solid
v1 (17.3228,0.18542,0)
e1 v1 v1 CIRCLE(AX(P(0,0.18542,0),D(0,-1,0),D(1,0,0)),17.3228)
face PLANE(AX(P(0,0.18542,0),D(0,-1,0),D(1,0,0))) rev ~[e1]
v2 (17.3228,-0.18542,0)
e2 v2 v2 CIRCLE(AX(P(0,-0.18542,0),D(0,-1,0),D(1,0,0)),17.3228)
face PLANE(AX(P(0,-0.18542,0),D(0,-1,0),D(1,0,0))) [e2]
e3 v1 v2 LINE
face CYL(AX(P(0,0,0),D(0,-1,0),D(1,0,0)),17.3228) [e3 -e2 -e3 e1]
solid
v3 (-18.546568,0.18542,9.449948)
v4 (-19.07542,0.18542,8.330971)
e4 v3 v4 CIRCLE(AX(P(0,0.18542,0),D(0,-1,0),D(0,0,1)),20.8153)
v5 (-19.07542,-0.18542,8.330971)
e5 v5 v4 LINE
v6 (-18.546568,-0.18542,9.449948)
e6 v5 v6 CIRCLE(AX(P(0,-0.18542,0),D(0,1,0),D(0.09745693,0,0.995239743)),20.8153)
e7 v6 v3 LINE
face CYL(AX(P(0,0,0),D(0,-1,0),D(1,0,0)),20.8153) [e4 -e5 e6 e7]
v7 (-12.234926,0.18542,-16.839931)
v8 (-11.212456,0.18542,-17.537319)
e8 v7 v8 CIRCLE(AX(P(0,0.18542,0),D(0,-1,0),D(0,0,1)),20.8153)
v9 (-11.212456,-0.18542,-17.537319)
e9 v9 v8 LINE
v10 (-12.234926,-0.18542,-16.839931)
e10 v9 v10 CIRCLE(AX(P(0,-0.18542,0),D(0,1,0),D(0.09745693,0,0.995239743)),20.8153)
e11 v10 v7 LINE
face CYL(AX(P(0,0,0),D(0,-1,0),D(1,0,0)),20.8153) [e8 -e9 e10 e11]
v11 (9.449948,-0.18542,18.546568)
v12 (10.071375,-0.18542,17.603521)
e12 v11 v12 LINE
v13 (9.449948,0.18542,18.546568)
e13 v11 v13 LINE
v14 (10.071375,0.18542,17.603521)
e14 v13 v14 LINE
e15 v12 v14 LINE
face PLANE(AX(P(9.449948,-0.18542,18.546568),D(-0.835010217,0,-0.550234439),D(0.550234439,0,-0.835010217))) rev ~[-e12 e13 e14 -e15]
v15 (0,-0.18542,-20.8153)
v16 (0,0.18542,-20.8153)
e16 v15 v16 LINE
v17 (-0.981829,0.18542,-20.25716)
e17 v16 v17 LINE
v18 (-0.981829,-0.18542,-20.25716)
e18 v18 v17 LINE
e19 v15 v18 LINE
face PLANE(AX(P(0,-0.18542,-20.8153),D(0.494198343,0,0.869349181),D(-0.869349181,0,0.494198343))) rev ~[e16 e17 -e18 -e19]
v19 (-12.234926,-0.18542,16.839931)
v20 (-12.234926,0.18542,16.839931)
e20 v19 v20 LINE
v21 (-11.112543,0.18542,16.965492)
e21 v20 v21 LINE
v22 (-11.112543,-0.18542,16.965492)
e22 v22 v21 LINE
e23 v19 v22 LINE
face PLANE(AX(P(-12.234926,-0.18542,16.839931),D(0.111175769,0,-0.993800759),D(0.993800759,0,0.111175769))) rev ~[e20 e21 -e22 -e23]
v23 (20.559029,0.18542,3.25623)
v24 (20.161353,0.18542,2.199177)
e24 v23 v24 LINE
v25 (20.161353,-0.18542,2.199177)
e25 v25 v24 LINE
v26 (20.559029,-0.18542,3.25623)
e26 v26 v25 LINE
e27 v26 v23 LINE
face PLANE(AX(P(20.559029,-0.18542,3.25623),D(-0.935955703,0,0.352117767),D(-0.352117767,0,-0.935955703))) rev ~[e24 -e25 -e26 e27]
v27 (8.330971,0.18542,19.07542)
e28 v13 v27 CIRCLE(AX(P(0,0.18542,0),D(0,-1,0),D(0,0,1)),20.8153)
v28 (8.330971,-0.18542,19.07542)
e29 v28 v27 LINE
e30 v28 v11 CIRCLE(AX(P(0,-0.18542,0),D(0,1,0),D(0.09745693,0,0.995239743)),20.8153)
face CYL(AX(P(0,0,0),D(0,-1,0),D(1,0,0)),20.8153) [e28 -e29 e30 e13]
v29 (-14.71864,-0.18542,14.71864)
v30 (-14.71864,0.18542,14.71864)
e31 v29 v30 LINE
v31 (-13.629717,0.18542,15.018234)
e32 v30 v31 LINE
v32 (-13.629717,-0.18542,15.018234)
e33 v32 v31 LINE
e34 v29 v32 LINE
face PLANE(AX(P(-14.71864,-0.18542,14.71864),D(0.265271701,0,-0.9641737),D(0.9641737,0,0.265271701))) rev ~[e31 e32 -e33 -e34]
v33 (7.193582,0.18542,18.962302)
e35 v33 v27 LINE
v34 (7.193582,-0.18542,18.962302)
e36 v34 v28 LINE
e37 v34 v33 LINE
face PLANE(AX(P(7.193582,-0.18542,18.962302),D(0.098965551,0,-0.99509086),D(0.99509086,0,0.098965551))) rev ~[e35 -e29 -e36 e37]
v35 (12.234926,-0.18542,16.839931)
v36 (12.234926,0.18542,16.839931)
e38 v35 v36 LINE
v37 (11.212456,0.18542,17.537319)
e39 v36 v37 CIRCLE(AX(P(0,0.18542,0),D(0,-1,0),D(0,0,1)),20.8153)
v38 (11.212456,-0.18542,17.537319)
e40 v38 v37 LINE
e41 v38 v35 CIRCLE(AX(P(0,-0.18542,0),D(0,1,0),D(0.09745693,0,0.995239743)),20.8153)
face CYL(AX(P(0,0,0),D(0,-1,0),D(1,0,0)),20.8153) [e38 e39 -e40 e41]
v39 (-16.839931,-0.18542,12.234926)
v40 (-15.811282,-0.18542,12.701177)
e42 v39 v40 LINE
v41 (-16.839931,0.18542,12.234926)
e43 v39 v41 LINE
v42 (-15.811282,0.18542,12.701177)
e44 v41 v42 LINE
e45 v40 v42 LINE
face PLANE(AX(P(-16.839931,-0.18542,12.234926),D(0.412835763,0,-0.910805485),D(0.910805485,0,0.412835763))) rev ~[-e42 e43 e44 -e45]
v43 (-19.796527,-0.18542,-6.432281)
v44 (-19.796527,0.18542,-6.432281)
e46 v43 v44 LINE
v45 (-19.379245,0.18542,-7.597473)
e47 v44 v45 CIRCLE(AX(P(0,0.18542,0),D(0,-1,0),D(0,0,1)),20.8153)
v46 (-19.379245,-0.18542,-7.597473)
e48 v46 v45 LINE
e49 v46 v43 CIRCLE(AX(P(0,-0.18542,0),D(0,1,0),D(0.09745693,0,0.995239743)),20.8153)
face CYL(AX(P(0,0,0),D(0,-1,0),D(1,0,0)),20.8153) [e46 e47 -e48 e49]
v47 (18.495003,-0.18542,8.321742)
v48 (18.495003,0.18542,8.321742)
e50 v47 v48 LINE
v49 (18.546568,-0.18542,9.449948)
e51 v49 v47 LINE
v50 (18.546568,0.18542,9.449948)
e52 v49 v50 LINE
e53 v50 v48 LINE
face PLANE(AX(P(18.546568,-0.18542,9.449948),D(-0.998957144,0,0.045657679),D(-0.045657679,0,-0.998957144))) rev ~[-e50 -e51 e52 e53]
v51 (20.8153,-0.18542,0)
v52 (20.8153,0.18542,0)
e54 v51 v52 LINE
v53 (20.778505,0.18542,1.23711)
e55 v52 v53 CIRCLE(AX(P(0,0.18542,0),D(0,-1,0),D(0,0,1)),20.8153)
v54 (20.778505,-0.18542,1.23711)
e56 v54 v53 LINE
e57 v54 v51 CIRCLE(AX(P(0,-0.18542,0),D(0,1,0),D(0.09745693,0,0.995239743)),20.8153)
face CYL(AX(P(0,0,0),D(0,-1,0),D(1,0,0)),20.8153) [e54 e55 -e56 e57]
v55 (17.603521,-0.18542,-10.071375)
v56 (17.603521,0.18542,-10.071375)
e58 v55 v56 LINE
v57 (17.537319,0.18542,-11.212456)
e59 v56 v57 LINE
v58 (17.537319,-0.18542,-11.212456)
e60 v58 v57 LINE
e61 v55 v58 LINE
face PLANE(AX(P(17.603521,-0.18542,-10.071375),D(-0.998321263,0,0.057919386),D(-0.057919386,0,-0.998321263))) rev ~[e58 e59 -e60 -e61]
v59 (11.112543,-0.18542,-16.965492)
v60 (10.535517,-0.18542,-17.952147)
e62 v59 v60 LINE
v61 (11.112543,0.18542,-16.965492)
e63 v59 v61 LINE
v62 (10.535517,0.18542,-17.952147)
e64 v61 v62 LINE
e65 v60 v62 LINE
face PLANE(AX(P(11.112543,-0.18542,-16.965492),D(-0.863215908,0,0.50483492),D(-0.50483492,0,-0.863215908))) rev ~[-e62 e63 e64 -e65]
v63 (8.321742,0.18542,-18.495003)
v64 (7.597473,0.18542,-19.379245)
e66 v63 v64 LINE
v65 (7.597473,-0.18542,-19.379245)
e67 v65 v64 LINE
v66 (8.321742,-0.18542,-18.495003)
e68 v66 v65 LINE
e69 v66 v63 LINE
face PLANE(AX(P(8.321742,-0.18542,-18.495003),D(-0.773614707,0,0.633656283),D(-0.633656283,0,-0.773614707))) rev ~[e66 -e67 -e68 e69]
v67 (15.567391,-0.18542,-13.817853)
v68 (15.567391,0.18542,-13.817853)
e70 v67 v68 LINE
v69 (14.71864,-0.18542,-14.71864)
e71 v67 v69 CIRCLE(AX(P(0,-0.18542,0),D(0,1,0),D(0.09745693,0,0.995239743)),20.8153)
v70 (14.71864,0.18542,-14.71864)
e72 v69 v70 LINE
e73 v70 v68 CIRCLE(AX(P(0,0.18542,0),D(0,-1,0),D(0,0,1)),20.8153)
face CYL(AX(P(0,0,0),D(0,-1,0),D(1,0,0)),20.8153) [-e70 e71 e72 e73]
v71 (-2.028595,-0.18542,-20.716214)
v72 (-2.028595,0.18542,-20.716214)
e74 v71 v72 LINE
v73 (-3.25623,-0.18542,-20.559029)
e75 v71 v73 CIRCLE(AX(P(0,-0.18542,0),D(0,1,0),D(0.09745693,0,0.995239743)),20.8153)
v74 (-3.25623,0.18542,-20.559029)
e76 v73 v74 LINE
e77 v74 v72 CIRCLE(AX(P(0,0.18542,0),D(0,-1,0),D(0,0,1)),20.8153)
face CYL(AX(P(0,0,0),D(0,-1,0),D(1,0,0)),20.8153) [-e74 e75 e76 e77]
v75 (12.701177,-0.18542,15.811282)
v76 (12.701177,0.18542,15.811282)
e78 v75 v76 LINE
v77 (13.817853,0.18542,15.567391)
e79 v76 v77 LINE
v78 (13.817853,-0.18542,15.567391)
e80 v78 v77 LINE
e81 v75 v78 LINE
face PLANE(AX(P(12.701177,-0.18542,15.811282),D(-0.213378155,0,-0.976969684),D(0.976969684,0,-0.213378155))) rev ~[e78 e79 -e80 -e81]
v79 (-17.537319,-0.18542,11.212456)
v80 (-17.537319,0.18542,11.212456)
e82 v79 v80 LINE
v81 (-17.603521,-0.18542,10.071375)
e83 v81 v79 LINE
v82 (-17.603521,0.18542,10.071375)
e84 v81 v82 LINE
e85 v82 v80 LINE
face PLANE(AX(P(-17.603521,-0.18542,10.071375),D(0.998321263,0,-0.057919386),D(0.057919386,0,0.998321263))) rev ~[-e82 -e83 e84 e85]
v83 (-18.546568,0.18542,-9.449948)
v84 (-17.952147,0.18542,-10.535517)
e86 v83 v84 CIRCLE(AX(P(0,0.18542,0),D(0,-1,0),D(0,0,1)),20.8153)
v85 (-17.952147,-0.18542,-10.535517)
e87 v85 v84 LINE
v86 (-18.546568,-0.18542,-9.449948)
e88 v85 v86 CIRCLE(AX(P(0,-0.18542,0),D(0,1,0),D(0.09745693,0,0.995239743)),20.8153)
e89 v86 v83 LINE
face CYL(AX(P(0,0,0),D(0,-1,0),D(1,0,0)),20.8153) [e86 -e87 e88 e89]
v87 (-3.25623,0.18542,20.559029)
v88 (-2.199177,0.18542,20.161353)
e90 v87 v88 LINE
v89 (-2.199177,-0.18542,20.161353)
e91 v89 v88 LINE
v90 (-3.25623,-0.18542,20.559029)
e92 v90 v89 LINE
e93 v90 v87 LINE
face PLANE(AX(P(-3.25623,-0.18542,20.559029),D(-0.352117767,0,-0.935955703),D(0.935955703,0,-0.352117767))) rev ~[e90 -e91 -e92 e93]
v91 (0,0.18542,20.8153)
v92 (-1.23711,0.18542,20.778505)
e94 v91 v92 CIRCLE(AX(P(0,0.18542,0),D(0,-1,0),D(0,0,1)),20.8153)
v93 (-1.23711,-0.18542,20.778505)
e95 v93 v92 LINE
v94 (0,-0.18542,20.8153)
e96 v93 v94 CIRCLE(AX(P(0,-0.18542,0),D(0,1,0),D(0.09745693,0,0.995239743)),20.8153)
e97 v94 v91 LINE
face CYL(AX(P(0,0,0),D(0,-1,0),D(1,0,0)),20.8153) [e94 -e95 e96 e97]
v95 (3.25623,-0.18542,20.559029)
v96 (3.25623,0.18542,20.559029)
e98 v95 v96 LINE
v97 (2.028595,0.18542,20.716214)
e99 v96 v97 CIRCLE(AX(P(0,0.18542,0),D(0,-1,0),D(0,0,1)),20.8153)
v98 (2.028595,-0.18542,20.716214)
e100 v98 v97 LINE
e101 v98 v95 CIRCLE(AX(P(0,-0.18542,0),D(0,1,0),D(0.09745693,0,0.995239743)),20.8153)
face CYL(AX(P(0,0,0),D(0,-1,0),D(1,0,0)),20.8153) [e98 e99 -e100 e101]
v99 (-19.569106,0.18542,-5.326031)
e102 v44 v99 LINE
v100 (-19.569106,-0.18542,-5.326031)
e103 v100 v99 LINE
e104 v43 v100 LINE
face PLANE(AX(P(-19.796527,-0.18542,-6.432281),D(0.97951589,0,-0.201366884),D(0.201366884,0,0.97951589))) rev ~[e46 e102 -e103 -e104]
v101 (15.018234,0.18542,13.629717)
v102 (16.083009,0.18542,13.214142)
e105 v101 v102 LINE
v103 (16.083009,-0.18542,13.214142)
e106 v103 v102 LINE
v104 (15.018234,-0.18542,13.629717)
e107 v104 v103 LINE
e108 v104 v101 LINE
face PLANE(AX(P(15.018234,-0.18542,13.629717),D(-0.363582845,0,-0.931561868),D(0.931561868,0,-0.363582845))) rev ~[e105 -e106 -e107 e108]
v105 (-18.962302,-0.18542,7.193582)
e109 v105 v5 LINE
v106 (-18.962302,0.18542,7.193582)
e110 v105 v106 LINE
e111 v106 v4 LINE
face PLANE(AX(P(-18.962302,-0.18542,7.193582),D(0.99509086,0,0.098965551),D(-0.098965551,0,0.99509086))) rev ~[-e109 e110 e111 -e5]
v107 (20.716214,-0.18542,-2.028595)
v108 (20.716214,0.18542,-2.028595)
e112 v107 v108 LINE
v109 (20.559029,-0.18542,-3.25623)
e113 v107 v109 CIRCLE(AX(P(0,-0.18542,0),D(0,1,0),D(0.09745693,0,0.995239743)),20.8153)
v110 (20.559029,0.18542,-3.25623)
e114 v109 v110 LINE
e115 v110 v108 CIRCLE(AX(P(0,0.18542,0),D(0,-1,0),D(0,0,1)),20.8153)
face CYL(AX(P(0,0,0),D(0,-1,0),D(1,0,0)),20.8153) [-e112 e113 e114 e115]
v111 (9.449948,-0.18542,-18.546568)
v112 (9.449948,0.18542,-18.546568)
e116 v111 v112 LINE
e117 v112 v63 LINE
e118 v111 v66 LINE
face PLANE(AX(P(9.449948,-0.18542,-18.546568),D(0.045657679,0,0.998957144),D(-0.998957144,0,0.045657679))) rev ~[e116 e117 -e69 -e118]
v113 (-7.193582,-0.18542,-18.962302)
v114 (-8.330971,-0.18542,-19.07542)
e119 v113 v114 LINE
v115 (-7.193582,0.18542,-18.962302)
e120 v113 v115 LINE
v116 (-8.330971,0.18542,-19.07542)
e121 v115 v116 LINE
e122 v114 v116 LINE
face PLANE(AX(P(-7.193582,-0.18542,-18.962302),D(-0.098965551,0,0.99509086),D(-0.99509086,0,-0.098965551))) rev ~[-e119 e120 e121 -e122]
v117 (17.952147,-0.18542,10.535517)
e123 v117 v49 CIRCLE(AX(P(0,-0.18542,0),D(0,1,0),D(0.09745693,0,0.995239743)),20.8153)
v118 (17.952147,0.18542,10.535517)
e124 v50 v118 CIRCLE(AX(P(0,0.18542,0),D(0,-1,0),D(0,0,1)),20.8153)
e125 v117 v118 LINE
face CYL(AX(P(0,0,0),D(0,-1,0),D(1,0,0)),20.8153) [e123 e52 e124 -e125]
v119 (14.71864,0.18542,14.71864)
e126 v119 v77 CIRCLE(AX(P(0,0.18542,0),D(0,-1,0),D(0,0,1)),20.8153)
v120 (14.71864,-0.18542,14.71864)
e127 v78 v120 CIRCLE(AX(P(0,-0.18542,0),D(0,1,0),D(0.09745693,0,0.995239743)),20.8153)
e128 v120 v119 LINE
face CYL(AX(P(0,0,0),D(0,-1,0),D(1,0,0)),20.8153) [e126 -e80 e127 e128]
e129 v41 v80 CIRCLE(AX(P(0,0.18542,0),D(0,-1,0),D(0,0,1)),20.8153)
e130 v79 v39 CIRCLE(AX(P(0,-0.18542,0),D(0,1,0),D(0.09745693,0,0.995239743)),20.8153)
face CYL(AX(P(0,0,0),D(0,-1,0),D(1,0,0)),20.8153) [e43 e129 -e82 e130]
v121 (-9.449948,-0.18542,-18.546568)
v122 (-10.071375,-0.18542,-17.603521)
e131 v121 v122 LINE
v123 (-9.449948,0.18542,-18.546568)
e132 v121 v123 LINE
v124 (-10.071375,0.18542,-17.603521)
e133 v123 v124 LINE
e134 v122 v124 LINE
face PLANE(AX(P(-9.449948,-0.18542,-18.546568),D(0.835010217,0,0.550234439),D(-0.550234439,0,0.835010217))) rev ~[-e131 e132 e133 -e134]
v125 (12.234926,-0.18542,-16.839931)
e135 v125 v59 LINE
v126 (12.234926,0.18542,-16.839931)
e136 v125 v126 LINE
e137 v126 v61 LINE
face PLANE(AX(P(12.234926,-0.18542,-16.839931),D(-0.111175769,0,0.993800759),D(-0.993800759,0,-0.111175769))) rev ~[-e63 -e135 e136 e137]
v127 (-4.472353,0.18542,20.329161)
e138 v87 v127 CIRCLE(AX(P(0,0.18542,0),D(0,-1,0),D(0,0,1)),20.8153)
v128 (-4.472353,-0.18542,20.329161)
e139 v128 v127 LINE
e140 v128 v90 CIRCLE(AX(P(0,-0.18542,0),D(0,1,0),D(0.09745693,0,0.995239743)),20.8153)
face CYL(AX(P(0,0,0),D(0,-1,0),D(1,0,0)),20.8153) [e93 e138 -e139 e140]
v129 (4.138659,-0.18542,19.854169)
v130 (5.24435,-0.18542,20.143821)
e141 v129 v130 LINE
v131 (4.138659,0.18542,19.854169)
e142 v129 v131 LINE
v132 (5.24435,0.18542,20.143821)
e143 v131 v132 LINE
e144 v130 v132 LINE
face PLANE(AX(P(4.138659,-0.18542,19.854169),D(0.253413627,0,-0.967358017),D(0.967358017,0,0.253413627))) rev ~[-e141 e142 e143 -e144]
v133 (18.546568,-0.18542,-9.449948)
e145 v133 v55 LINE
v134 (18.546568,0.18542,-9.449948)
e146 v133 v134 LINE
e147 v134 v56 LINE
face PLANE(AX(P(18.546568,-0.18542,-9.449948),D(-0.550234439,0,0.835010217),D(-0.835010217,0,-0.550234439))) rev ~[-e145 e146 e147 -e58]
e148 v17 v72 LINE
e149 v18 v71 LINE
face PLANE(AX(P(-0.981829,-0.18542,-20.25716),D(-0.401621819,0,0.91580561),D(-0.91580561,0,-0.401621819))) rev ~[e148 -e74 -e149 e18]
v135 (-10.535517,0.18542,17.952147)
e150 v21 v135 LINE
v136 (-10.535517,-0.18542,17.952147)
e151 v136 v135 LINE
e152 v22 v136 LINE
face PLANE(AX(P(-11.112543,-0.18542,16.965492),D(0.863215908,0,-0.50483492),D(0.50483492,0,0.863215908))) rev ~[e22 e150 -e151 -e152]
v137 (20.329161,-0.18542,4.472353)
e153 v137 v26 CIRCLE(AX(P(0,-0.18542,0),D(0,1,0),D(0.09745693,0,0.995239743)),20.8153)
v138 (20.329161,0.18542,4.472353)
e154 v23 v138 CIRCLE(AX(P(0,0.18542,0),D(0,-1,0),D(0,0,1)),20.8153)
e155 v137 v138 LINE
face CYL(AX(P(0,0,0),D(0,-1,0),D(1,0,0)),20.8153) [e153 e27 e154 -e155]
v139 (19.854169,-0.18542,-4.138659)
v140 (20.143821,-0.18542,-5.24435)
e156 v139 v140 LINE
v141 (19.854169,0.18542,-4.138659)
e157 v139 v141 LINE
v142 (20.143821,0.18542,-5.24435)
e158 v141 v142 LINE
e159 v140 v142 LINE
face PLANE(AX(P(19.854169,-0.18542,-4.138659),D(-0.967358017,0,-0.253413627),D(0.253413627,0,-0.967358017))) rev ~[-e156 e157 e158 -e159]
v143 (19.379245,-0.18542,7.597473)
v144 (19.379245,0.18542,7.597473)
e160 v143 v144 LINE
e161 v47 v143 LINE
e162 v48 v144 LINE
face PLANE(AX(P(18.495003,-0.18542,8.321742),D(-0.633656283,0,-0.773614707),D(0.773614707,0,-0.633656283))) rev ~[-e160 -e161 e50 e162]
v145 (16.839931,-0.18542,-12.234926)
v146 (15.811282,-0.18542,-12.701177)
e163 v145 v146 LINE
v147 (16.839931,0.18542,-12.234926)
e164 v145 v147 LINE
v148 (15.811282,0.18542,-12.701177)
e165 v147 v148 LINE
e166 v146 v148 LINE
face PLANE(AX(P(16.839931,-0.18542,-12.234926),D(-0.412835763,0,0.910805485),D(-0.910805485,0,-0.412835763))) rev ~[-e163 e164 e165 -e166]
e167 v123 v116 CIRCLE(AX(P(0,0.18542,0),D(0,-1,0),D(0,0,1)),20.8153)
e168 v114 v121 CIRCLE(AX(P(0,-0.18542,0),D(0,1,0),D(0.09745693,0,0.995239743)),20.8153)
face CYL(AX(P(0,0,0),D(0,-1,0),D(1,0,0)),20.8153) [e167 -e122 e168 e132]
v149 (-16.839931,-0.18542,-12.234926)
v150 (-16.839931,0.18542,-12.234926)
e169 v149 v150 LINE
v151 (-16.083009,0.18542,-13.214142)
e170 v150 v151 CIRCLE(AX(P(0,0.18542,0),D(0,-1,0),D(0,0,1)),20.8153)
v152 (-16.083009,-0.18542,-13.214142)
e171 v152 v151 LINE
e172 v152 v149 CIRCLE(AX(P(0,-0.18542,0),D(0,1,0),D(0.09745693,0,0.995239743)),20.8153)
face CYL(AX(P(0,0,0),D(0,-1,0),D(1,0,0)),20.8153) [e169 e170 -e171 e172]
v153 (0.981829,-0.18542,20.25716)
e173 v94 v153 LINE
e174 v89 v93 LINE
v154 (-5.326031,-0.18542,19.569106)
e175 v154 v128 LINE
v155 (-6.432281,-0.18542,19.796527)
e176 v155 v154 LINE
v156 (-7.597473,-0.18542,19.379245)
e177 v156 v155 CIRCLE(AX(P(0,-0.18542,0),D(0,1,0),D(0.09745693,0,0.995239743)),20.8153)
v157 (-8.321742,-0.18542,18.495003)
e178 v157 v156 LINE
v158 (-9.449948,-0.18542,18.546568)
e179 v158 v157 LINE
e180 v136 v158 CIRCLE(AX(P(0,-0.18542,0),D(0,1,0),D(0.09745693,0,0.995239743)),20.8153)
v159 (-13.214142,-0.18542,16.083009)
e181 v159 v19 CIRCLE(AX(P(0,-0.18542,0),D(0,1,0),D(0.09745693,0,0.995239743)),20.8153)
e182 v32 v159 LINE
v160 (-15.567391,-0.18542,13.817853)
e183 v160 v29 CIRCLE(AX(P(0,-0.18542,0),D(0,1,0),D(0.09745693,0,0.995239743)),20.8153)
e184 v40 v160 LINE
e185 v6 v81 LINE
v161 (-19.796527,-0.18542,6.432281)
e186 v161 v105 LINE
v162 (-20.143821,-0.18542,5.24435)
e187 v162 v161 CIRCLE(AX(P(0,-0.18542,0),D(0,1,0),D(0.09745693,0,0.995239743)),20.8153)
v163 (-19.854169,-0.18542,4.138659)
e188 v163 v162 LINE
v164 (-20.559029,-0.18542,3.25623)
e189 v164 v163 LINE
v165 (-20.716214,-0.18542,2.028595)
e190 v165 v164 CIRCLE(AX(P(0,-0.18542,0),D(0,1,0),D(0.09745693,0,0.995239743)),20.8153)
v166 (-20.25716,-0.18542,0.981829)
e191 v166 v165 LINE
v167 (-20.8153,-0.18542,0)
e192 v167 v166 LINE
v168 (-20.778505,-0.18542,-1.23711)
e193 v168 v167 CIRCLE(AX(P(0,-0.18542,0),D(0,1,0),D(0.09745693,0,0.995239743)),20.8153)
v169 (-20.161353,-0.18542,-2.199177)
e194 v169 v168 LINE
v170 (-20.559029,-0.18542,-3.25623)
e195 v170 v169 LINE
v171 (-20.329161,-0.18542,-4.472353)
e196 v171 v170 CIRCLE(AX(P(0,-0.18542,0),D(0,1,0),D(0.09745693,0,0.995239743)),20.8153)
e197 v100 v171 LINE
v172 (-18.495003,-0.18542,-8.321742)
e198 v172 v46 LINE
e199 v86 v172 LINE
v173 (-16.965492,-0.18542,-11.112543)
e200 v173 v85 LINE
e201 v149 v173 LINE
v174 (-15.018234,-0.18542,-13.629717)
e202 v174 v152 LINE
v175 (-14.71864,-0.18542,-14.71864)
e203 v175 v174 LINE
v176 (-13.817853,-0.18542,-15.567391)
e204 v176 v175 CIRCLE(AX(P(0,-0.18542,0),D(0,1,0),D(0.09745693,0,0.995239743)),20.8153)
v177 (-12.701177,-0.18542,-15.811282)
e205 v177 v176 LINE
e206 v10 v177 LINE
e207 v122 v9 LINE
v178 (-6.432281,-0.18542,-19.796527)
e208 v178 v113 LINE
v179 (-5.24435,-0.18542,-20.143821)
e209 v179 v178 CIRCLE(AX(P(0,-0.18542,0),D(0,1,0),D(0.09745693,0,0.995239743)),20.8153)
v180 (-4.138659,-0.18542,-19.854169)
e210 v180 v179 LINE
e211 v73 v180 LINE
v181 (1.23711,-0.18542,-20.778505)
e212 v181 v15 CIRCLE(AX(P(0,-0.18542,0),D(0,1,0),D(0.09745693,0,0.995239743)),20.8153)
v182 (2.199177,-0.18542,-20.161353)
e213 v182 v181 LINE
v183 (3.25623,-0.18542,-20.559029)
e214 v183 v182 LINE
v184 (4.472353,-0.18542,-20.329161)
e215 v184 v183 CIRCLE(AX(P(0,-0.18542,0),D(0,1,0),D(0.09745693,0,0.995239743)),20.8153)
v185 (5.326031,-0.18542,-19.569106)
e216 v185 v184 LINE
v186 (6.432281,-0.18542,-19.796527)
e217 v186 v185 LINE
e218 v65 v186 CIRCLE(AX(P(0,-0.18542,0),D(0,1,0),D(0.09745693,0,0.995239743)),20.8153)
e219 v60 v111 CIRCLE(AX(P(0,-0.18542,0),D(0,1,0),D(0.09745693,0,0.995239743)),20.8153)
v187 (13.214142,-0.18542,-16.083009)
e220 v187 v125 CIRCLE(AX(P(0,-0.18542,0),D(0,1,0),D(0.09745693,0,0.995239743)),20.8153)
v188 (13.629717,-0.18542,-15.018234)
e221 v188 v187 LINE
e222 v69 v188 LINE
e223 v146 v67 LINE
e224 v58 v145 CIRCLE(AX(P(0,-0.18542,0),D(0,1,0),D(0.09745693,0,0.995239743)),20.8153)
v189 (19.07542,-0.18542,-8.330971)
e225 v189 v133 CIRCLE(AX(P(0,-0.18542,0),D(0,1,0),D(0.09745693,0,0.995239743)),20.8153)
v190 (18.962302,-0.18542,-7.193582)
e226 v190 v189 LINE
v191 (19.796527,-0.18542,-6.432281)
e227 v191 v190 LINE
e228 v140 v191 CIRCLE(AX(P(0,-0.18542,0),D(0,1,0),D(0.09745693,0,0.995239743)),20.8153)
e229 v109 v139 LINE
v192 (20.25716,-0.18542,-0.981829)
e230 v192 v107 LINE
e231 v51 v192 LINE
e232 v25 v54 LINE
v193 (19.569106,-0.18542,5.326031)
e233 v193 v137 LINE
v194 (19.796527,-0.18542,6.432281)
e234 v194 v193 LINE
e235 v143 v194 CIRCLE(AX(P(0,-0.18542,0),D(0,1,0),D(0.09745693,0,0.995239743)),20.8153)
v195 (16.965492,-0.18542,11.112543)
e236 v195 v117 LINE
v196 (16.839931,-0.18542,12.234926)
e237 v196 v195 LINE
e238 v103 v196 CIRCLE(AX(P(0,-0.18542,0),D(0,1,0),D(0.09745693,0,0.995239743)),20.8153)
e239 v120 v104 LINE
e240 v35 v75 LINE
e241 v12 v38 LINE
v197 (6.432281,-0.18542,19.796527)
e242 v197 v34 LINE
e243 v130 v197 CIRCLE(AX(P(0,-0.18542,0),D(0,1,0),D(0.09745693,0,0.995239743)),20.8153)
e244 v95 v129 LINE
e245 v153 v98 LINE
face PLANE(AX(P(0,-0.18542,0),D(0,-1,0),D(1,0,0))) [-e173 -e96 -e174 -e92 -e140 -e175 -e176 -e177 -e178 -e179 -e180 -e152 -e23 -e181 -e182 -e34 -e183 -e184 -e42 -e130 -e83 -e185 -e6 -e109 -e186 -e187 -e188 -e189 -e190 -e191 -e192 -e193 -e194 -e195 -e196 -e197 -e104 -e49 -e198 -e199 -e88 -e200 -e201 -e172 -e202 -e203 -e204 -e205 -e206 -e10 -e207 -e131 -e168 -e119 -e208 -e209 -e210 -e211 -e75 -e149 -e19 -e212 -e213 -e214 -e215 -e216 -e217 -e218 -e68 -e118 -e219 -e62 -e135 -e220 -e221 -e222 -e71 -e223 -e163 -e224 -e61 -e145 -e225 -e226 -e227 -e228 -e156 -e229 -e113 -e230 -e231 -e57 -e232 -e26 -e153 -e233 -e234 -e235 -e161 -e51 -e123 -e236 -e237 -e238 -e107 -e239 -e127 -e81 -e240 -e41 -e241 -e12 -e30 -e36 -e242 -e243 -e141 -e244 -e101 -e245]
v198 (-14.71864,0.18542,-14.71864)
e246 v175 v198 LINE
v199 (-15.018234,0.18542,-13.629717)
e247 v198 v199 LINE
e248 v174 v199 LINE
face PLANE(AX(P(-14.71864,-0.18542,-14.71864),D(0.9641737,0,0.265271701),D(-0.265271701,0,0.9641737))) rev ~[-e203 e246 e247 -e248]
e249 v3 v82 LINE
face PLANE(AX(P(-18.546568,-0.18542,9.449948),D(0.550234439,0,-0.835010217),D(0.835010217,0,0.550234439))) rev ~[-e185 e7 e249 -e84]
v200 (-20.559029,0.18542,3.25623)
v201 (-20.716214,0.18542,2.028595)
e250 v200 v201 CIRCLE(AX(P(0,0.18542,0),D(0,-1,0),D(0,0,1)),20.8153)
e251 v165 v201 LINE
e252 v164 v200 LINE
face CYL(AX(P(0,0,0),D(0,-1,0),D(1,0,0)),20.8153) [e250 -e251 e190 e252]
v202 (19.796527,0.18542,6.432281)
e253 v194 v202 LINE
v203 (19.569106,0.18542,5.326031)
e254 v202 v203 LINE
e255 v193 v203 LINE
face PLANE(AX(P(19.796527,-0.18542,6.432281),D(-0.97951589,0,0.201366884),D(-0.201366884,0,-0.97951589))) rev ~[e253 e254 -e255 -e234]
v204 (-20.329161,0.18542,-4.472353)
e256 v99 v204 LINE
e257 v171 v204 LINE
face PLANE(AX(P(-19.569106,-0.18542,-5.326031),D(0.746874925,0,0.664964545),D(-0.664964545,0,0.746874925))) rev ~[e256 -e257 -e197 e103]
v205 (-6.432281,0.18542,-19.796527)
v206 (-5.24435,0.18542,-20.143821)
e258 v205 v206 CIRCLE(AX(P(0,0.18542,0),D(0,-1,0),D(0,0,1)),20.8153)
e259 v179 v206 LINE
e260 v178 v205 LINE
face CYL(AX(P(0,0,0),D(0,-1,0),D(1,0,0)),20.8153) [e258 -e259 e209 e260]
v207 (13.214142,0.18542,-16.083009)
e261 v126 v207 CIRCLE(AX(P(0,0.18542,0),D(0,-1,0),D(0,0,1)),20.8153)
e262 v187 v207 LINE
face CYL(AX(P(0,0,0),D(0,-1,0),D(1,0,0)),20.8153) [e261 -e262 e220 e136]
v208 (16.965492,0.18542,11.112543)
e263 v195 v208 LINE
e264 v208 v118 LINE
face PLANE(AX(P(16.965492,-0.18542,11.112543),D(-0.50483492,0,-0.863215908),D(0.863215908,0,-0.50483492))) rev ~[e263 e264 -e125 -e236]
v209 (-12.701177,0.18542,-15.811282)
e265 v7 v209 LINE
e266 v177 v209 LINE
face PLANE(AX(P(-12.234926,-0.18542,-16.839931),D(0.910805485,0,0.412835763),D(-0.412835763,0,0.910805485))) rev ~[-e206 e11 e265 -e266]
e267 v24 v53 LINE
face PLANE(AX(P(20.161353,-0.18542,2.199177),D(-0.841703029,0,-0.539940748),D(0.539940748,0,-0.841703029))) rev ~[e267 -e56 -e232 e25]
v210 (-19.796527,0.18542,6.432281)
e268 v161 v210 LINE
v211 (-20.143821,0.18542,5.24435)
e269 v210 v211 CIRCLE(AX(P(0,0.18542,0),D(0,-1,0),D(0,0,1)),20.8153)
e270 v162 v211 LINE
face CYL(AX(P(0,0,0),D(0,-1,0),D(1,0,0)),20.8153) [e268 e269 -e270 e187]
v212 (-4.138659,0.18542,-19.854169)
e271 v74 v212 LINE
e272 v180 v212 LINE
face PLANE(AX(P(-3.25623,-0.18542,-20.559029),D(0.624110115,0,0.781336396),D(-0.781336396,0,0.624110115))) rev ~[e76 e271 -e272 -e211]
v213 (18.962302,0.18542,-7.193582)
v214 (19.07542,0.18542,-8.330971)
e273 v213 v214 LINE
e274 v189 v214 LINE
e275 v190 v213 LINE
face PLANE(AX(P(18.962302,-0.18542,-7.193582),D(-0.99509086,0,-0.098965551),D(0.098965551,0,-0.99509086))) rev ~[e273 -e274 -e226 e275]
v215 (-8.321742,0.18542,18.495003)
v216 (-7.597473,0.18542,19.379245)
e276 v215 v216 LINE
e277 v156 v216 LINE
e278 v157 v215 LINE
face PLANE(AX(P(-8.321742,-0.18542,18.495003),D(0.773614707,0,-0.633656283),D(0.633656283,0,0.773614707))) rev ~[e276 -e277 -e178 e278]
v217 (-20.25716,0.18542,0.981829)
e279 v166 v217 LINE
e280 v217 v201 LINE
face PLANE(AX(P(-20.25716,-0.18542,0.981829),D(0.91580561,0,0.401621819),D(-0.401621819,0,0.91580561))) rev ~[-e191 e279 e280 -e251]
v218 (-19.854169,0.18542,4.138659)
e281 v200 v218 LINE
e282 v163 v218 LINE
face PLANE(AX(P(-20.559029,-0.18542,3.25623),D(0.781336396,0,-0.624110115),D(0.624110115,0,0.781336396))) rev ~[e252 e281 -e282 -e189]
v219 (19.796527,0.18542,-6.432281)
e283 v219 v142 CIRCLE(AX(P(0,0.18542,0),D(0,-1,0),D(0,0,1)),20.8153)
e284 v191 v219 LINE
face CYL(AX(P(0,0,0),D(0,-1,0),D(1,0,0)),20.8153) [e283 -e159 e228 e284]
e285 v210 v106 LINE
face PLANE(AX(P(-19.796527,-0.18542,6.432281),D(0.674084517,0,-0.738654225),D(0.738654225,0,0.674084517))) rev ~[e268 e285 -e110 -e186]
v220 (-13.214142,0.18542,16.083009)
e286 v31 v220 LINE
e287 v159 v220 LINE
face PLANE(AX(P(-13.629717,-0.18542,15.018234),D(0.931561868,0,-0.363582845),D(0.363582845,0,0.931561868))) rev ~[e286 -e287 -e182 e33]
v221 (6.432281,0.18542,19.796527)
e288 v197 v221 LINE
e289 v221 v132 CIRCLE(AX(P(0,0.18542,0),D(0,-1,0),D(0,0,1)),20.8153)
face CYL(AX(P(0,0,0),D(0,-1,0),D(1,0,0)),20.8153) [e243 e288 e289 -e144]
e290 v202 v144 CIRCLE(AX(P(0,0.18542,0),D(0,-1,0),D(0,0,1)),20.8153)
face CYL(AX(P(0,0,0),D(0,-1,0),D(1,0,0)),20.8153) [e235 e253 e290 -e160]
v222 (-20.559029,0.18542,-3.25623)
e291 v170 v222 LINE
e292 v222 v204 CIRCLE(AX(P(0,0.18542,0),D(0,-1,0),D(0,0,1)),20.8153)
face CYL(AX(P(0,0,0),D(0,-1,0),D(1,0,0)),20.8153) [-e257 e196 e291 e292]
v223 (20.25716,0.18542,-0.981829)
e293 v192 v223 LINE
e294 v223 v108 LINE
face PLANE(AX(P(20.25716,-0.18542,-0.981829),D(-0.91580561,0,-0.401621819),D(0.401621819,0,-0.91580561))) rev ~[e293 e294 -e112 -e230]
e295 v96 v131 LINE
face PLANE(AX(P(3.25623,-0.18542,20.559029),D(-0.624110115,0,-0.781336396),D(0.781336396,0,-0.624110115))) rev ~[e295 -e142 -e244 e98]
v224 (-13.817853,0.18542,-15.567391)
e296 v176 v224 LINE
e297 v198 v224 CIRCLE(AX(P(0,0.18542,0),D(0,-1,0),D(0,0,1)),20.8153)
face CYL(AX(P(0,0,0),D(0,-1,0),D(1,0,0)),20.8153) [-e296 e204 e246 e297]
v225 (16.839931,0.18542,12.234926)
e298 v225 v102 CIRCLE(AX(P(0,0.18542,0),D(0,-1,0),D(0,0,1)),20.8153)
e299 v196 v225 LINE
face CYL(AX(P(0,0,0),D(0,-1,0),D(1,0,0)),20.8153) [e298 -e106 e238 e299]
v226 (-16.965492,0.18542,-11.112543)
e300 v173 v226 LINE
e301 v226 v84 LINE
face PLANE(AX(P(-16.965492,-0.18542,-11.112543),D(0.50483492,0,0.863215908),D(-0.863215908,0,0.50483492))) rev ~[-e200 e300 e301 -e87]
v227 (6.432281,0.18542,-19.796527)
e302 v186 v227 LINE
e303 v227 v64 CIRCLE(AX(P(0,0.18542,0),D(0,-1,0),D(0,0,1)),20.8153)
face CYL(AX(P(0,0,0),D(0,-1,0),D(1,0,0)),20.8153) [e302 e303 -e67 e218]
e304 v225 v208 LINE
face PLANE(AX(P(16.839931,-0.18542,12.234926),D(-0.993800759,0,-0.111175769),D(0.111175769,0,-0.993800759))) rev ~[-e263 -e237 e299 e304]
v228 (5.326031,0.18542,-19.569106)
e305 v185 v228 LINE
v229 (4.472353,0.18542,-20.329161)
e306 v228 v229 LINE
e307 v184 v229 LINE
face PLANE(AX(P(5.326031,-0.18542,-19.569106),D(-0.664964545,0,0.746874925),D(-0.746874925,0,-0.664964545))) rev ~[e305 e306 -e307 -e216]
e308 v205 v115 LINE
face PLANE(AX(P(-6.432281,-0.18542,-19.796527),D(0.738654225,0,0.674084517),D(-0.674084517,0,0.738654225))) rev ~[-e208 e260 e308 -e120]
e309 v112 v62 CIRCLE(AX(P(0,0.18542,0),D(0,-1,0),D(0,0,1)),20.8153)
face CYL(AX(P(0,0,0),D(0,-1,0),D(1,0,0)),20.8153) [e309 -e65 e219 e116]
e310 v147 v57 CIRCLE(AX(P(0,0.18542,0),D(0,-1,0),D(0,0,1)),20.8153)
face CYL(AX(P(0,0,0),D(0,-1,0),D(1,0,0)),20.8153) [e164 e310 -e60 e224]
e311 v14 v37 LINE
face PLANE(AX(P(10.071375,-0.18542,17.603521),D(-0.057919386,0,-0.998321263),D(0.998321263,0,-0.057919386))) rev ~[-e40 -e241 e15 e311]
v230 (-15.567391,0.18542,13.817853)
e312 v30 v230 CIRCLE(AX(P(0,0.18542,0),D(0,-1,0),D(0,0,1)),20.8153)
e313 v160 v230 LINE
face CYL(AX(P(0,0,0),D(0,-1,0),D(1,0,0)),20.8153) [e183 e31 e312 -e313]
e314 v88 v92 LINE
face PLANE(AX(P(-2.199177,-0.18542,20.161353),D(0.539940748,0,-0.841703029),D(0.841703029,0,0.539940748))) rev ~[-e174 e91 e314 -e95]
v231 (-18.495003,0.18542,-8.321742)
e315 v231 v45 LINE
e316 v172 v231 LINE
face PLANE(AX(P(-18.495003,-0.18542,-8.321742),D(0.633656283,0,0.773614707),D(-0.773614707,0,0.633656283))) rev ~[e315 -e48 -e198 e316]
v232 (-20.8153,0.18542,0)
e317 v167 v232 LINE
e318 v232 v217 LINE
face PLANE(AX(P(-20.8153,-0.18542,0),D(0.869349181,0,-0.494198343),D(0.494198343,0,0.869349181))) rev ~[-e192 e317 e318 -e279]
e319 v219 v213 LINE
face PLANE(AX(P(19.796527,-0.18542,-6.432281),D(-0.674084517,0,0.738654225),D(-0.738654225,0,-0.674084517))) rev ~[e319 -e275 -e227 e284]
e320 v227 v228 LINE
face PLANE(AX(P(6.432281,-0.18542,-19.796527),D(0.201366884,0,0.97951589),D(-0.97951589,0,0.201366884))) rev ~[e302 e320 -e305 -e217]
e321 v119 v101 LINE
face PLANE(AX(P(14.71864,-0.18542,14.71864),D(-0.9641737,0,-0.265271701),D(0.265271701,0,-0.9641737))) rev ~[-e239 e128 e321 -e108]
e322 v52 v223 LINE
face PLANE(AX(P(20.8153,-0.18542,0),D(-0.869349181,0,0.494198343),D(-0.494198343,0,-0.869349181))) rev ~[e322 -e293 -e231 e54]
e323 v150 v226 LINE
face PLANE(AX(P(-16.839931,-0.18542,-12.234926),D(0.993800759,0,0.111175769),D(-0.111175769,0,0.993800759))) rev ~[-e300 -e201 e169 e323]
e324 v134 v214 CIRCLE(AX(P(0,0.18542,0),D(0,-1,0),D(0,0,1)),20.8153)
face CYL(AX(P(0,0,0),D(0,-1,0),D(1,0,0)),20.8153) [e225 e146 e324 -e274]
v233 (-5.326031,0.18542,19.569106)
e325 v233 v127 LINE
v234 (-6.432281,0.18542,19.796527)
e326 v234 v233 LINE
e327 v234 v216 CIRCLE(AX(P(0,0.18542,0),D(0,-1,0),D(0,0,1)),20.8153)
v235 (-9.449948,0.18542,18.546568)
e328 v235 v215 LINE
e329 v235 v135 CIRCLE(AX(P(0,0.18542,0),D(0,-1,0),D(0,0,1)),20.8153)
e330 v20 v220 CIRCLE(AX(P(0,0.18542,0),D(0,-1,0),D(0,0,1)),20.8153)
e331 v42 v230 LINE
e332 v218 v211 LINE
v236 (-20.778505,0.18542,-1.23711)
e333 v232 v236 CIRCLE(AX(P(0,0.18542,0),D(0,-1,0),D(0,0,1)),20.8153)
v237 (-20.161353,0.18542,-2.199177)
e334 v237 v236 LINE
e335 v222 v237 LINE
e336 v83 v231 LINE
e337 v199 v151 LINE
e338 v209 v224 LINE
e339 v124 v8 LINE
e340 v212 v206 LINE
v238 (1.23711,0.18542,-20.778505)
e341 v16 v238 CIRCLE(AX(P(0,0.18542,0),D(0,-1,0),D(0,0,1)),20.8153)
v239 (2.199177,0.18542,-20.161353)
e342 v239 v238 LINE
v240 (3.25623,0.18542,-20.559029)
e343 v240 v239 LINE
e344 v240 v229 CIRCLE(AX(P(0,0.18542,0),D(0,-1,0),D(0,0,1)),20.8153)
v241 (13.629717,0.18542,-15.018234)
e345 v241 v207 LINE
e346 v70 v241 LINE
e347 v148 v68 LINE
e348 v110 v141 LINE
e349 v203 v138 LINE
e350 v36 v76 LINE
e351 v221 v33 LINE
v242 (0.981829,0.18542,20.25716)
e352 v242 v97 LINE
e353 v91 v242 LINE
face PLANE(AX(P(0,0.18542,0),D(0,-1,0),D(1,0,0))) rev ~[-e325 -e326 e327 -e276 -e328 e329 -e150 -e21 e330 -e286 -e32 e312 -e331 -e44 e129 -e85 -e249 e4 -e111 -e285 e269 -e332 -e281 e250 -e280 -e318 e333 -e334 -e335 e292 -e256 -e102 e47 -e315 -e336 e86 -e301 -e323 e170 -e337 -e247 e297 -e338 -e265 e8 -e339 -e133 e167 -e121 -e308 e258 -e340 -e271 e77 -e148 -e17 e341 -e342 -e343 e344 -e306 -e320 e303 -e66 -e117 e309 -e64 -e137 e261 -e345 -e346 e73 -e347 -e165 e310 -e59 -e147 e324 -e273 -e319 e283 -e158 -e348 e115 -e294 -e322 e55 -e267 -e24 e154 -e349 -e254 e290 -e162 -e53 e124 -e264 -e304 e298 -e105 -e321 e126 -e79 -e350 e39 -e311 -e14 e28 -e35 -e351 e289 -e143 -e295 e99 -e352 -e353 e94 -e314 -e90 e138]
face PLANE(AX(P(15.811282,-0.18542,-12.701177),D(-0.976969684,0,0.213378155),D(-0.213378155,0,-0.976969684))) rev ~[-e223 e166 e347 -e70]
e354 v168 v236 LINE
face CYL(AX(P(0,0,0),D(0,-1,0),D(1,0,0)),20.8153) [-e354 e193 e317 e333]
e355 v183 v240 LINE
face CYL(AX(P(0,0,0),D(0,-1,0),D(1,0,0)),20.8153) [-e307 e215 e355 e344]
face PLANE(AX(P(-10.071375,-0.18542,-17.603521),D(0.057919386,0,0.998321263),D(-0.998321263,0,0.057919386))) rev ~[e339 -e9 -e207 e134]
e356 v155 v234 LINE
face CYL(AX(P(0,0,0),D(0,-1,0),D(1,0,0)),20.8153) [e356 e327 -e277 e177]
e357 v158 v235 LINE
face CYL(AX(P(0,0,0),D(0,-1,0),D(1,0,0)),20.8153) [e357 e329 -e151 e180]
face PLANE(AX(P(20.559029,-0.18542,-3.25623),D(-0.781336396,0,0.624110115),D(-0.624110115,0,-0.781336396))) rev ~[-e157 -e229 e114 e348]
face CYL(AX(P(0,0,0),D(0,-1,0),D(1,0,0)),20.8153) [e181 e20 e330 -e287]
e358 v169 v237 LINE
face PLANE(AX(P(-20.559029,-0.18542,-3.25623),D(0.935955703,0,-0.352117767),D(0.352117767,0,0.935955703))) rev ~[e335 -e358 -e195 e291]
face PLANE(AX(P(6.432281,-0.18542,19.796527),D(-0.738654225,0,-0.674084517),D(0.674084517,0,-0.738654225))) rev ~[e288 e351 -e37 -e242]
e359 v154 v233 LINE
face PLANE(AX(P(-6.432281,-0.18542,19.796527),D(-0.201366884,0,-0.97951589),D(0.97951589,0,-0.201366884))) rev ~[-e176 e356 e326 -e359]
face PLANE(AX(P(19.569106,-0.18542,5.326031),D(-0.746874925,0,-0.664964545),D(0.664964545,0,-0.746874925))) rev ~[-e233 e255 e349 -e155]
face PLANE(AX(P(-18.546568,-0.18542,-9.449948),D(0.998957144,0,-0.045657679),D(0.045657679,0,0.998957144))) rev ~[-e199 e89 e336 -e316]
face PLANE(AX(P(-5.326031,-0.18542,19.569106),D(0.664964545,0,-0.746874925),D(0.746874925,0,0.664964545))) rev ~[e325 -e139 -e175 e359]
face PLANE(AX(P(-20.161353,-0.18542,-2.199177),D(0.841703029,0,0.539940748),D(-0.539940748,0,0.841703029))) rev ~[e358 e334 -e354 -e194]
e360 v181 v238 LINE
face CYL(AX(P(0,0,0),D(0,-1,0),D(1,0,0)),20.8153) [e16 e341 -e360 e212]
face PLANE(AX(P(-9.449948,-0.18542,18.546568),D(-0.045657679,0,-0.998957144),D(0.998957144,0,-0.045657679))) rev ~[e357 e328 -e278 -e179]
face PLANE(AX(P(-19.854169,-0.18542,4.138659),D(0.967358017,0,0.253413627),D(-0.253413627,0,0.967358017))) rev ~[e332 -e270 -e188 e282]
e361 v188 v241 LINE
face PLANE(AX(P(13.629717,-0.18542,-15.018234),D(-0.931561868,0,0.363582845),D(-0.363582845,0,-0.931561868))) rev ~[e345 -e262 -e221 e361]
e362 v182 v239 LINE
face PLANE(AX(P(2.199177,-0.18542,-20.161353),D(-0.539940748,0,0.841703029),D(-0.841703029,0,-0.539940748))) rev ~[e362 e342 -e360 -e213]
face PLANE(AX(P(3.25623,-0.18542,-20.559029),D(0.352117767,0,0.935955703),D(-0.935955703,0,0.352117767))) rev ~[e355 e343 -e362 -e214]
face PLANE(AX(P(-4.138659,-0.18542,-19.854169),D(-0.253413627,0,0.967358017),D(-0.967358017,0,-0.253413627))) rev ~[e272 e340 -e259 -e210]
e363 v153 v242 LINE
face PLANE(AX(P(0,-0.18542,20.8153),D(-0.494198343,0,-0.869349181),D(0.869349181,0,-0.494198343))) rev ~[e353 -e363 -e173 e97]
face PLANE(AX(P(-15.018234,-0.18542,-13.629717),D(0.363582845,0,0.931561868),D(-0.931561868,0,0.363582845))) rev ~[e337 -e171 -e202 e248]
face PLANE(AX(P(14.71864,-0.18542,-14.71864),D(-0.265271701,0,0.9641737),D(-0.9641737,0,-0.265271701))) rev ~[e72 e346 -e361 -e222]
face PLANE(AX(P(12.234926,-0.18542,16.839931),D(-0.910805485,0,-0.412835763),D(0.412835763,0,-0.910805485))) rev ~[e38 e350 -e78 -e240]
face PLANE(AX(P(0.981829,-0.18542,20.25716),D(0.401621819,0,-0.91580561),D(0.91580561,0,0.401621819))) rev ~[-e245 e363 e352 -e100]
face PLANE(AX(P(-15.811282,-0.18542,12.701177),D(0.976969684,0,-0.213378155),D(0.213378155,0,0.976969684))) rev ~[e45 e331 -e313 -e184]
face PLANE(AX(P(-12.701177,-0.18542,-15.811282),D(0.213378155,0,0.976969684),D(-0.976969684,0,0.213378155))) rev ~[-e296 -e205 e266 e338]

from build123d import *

# Parameters (mm, degrees)
F0_R            = 17.3228
F2_DEPTH        = 0.18542
F1_R            = 20.8153
F4_DEPTH        = 0.37184
F4_COPIES_COUNT = 40


# Not quite as in the source:
# - a feature of the source that left no trace in its solid (it failed there, or was rolled back) is left out
# - a pattern or mirror of a feature is missing from the dataset's text; its kind, count and spacing are read off the source's solid


with BuildPart() as f2:
    # F0 (on Front) → F2 (new body, symmetric)
    with BuildSketch(Plane.XZ):
        Circle(F0_R)
    extrude(amount=F2_DEPTH, both=True)


with BuildPart() as f2b:
    # F1 (on Front) → F2, piece 2 (new body, symmetric)
    with BuildSketch(Plane.XZ):
        Circle(F1_R)
    extrude(amount=F2_DEPTH, both=True)

    # F3 (on face) → F4 (cut, through all)
    with BuildSketch(Plane.XZ.offset(0.18542)):
        with BuildLine():
            ThreePointArc((2.0285952307, 20.7162138307), (1.0155068536, 20.7905137002), (0, 20.8153))
            Line((0, 20.8153), (0.9818294189, 20.2571600918))
            Line((0.9818294189, 20.2571600918), (2.0285952307, 20.7162138307))
        make_face()
    f4 = extrude(amount=-F4_DEPTH, mode=Mode.SUBTRACT)

    # F4_copies: F4 ×40 about axis
    f4_copies_axis = Axis((0, 0, 0), (0, 1, 0))
    for i in range(1, F4_COPIES_COUNT):
        add(f4.rotate(f4_copies_axis, i * 360 / F4_COPIES_COUNT), mode=Mode.SUBTRACT)


solid = Compound([f2.part, f2b.part])
